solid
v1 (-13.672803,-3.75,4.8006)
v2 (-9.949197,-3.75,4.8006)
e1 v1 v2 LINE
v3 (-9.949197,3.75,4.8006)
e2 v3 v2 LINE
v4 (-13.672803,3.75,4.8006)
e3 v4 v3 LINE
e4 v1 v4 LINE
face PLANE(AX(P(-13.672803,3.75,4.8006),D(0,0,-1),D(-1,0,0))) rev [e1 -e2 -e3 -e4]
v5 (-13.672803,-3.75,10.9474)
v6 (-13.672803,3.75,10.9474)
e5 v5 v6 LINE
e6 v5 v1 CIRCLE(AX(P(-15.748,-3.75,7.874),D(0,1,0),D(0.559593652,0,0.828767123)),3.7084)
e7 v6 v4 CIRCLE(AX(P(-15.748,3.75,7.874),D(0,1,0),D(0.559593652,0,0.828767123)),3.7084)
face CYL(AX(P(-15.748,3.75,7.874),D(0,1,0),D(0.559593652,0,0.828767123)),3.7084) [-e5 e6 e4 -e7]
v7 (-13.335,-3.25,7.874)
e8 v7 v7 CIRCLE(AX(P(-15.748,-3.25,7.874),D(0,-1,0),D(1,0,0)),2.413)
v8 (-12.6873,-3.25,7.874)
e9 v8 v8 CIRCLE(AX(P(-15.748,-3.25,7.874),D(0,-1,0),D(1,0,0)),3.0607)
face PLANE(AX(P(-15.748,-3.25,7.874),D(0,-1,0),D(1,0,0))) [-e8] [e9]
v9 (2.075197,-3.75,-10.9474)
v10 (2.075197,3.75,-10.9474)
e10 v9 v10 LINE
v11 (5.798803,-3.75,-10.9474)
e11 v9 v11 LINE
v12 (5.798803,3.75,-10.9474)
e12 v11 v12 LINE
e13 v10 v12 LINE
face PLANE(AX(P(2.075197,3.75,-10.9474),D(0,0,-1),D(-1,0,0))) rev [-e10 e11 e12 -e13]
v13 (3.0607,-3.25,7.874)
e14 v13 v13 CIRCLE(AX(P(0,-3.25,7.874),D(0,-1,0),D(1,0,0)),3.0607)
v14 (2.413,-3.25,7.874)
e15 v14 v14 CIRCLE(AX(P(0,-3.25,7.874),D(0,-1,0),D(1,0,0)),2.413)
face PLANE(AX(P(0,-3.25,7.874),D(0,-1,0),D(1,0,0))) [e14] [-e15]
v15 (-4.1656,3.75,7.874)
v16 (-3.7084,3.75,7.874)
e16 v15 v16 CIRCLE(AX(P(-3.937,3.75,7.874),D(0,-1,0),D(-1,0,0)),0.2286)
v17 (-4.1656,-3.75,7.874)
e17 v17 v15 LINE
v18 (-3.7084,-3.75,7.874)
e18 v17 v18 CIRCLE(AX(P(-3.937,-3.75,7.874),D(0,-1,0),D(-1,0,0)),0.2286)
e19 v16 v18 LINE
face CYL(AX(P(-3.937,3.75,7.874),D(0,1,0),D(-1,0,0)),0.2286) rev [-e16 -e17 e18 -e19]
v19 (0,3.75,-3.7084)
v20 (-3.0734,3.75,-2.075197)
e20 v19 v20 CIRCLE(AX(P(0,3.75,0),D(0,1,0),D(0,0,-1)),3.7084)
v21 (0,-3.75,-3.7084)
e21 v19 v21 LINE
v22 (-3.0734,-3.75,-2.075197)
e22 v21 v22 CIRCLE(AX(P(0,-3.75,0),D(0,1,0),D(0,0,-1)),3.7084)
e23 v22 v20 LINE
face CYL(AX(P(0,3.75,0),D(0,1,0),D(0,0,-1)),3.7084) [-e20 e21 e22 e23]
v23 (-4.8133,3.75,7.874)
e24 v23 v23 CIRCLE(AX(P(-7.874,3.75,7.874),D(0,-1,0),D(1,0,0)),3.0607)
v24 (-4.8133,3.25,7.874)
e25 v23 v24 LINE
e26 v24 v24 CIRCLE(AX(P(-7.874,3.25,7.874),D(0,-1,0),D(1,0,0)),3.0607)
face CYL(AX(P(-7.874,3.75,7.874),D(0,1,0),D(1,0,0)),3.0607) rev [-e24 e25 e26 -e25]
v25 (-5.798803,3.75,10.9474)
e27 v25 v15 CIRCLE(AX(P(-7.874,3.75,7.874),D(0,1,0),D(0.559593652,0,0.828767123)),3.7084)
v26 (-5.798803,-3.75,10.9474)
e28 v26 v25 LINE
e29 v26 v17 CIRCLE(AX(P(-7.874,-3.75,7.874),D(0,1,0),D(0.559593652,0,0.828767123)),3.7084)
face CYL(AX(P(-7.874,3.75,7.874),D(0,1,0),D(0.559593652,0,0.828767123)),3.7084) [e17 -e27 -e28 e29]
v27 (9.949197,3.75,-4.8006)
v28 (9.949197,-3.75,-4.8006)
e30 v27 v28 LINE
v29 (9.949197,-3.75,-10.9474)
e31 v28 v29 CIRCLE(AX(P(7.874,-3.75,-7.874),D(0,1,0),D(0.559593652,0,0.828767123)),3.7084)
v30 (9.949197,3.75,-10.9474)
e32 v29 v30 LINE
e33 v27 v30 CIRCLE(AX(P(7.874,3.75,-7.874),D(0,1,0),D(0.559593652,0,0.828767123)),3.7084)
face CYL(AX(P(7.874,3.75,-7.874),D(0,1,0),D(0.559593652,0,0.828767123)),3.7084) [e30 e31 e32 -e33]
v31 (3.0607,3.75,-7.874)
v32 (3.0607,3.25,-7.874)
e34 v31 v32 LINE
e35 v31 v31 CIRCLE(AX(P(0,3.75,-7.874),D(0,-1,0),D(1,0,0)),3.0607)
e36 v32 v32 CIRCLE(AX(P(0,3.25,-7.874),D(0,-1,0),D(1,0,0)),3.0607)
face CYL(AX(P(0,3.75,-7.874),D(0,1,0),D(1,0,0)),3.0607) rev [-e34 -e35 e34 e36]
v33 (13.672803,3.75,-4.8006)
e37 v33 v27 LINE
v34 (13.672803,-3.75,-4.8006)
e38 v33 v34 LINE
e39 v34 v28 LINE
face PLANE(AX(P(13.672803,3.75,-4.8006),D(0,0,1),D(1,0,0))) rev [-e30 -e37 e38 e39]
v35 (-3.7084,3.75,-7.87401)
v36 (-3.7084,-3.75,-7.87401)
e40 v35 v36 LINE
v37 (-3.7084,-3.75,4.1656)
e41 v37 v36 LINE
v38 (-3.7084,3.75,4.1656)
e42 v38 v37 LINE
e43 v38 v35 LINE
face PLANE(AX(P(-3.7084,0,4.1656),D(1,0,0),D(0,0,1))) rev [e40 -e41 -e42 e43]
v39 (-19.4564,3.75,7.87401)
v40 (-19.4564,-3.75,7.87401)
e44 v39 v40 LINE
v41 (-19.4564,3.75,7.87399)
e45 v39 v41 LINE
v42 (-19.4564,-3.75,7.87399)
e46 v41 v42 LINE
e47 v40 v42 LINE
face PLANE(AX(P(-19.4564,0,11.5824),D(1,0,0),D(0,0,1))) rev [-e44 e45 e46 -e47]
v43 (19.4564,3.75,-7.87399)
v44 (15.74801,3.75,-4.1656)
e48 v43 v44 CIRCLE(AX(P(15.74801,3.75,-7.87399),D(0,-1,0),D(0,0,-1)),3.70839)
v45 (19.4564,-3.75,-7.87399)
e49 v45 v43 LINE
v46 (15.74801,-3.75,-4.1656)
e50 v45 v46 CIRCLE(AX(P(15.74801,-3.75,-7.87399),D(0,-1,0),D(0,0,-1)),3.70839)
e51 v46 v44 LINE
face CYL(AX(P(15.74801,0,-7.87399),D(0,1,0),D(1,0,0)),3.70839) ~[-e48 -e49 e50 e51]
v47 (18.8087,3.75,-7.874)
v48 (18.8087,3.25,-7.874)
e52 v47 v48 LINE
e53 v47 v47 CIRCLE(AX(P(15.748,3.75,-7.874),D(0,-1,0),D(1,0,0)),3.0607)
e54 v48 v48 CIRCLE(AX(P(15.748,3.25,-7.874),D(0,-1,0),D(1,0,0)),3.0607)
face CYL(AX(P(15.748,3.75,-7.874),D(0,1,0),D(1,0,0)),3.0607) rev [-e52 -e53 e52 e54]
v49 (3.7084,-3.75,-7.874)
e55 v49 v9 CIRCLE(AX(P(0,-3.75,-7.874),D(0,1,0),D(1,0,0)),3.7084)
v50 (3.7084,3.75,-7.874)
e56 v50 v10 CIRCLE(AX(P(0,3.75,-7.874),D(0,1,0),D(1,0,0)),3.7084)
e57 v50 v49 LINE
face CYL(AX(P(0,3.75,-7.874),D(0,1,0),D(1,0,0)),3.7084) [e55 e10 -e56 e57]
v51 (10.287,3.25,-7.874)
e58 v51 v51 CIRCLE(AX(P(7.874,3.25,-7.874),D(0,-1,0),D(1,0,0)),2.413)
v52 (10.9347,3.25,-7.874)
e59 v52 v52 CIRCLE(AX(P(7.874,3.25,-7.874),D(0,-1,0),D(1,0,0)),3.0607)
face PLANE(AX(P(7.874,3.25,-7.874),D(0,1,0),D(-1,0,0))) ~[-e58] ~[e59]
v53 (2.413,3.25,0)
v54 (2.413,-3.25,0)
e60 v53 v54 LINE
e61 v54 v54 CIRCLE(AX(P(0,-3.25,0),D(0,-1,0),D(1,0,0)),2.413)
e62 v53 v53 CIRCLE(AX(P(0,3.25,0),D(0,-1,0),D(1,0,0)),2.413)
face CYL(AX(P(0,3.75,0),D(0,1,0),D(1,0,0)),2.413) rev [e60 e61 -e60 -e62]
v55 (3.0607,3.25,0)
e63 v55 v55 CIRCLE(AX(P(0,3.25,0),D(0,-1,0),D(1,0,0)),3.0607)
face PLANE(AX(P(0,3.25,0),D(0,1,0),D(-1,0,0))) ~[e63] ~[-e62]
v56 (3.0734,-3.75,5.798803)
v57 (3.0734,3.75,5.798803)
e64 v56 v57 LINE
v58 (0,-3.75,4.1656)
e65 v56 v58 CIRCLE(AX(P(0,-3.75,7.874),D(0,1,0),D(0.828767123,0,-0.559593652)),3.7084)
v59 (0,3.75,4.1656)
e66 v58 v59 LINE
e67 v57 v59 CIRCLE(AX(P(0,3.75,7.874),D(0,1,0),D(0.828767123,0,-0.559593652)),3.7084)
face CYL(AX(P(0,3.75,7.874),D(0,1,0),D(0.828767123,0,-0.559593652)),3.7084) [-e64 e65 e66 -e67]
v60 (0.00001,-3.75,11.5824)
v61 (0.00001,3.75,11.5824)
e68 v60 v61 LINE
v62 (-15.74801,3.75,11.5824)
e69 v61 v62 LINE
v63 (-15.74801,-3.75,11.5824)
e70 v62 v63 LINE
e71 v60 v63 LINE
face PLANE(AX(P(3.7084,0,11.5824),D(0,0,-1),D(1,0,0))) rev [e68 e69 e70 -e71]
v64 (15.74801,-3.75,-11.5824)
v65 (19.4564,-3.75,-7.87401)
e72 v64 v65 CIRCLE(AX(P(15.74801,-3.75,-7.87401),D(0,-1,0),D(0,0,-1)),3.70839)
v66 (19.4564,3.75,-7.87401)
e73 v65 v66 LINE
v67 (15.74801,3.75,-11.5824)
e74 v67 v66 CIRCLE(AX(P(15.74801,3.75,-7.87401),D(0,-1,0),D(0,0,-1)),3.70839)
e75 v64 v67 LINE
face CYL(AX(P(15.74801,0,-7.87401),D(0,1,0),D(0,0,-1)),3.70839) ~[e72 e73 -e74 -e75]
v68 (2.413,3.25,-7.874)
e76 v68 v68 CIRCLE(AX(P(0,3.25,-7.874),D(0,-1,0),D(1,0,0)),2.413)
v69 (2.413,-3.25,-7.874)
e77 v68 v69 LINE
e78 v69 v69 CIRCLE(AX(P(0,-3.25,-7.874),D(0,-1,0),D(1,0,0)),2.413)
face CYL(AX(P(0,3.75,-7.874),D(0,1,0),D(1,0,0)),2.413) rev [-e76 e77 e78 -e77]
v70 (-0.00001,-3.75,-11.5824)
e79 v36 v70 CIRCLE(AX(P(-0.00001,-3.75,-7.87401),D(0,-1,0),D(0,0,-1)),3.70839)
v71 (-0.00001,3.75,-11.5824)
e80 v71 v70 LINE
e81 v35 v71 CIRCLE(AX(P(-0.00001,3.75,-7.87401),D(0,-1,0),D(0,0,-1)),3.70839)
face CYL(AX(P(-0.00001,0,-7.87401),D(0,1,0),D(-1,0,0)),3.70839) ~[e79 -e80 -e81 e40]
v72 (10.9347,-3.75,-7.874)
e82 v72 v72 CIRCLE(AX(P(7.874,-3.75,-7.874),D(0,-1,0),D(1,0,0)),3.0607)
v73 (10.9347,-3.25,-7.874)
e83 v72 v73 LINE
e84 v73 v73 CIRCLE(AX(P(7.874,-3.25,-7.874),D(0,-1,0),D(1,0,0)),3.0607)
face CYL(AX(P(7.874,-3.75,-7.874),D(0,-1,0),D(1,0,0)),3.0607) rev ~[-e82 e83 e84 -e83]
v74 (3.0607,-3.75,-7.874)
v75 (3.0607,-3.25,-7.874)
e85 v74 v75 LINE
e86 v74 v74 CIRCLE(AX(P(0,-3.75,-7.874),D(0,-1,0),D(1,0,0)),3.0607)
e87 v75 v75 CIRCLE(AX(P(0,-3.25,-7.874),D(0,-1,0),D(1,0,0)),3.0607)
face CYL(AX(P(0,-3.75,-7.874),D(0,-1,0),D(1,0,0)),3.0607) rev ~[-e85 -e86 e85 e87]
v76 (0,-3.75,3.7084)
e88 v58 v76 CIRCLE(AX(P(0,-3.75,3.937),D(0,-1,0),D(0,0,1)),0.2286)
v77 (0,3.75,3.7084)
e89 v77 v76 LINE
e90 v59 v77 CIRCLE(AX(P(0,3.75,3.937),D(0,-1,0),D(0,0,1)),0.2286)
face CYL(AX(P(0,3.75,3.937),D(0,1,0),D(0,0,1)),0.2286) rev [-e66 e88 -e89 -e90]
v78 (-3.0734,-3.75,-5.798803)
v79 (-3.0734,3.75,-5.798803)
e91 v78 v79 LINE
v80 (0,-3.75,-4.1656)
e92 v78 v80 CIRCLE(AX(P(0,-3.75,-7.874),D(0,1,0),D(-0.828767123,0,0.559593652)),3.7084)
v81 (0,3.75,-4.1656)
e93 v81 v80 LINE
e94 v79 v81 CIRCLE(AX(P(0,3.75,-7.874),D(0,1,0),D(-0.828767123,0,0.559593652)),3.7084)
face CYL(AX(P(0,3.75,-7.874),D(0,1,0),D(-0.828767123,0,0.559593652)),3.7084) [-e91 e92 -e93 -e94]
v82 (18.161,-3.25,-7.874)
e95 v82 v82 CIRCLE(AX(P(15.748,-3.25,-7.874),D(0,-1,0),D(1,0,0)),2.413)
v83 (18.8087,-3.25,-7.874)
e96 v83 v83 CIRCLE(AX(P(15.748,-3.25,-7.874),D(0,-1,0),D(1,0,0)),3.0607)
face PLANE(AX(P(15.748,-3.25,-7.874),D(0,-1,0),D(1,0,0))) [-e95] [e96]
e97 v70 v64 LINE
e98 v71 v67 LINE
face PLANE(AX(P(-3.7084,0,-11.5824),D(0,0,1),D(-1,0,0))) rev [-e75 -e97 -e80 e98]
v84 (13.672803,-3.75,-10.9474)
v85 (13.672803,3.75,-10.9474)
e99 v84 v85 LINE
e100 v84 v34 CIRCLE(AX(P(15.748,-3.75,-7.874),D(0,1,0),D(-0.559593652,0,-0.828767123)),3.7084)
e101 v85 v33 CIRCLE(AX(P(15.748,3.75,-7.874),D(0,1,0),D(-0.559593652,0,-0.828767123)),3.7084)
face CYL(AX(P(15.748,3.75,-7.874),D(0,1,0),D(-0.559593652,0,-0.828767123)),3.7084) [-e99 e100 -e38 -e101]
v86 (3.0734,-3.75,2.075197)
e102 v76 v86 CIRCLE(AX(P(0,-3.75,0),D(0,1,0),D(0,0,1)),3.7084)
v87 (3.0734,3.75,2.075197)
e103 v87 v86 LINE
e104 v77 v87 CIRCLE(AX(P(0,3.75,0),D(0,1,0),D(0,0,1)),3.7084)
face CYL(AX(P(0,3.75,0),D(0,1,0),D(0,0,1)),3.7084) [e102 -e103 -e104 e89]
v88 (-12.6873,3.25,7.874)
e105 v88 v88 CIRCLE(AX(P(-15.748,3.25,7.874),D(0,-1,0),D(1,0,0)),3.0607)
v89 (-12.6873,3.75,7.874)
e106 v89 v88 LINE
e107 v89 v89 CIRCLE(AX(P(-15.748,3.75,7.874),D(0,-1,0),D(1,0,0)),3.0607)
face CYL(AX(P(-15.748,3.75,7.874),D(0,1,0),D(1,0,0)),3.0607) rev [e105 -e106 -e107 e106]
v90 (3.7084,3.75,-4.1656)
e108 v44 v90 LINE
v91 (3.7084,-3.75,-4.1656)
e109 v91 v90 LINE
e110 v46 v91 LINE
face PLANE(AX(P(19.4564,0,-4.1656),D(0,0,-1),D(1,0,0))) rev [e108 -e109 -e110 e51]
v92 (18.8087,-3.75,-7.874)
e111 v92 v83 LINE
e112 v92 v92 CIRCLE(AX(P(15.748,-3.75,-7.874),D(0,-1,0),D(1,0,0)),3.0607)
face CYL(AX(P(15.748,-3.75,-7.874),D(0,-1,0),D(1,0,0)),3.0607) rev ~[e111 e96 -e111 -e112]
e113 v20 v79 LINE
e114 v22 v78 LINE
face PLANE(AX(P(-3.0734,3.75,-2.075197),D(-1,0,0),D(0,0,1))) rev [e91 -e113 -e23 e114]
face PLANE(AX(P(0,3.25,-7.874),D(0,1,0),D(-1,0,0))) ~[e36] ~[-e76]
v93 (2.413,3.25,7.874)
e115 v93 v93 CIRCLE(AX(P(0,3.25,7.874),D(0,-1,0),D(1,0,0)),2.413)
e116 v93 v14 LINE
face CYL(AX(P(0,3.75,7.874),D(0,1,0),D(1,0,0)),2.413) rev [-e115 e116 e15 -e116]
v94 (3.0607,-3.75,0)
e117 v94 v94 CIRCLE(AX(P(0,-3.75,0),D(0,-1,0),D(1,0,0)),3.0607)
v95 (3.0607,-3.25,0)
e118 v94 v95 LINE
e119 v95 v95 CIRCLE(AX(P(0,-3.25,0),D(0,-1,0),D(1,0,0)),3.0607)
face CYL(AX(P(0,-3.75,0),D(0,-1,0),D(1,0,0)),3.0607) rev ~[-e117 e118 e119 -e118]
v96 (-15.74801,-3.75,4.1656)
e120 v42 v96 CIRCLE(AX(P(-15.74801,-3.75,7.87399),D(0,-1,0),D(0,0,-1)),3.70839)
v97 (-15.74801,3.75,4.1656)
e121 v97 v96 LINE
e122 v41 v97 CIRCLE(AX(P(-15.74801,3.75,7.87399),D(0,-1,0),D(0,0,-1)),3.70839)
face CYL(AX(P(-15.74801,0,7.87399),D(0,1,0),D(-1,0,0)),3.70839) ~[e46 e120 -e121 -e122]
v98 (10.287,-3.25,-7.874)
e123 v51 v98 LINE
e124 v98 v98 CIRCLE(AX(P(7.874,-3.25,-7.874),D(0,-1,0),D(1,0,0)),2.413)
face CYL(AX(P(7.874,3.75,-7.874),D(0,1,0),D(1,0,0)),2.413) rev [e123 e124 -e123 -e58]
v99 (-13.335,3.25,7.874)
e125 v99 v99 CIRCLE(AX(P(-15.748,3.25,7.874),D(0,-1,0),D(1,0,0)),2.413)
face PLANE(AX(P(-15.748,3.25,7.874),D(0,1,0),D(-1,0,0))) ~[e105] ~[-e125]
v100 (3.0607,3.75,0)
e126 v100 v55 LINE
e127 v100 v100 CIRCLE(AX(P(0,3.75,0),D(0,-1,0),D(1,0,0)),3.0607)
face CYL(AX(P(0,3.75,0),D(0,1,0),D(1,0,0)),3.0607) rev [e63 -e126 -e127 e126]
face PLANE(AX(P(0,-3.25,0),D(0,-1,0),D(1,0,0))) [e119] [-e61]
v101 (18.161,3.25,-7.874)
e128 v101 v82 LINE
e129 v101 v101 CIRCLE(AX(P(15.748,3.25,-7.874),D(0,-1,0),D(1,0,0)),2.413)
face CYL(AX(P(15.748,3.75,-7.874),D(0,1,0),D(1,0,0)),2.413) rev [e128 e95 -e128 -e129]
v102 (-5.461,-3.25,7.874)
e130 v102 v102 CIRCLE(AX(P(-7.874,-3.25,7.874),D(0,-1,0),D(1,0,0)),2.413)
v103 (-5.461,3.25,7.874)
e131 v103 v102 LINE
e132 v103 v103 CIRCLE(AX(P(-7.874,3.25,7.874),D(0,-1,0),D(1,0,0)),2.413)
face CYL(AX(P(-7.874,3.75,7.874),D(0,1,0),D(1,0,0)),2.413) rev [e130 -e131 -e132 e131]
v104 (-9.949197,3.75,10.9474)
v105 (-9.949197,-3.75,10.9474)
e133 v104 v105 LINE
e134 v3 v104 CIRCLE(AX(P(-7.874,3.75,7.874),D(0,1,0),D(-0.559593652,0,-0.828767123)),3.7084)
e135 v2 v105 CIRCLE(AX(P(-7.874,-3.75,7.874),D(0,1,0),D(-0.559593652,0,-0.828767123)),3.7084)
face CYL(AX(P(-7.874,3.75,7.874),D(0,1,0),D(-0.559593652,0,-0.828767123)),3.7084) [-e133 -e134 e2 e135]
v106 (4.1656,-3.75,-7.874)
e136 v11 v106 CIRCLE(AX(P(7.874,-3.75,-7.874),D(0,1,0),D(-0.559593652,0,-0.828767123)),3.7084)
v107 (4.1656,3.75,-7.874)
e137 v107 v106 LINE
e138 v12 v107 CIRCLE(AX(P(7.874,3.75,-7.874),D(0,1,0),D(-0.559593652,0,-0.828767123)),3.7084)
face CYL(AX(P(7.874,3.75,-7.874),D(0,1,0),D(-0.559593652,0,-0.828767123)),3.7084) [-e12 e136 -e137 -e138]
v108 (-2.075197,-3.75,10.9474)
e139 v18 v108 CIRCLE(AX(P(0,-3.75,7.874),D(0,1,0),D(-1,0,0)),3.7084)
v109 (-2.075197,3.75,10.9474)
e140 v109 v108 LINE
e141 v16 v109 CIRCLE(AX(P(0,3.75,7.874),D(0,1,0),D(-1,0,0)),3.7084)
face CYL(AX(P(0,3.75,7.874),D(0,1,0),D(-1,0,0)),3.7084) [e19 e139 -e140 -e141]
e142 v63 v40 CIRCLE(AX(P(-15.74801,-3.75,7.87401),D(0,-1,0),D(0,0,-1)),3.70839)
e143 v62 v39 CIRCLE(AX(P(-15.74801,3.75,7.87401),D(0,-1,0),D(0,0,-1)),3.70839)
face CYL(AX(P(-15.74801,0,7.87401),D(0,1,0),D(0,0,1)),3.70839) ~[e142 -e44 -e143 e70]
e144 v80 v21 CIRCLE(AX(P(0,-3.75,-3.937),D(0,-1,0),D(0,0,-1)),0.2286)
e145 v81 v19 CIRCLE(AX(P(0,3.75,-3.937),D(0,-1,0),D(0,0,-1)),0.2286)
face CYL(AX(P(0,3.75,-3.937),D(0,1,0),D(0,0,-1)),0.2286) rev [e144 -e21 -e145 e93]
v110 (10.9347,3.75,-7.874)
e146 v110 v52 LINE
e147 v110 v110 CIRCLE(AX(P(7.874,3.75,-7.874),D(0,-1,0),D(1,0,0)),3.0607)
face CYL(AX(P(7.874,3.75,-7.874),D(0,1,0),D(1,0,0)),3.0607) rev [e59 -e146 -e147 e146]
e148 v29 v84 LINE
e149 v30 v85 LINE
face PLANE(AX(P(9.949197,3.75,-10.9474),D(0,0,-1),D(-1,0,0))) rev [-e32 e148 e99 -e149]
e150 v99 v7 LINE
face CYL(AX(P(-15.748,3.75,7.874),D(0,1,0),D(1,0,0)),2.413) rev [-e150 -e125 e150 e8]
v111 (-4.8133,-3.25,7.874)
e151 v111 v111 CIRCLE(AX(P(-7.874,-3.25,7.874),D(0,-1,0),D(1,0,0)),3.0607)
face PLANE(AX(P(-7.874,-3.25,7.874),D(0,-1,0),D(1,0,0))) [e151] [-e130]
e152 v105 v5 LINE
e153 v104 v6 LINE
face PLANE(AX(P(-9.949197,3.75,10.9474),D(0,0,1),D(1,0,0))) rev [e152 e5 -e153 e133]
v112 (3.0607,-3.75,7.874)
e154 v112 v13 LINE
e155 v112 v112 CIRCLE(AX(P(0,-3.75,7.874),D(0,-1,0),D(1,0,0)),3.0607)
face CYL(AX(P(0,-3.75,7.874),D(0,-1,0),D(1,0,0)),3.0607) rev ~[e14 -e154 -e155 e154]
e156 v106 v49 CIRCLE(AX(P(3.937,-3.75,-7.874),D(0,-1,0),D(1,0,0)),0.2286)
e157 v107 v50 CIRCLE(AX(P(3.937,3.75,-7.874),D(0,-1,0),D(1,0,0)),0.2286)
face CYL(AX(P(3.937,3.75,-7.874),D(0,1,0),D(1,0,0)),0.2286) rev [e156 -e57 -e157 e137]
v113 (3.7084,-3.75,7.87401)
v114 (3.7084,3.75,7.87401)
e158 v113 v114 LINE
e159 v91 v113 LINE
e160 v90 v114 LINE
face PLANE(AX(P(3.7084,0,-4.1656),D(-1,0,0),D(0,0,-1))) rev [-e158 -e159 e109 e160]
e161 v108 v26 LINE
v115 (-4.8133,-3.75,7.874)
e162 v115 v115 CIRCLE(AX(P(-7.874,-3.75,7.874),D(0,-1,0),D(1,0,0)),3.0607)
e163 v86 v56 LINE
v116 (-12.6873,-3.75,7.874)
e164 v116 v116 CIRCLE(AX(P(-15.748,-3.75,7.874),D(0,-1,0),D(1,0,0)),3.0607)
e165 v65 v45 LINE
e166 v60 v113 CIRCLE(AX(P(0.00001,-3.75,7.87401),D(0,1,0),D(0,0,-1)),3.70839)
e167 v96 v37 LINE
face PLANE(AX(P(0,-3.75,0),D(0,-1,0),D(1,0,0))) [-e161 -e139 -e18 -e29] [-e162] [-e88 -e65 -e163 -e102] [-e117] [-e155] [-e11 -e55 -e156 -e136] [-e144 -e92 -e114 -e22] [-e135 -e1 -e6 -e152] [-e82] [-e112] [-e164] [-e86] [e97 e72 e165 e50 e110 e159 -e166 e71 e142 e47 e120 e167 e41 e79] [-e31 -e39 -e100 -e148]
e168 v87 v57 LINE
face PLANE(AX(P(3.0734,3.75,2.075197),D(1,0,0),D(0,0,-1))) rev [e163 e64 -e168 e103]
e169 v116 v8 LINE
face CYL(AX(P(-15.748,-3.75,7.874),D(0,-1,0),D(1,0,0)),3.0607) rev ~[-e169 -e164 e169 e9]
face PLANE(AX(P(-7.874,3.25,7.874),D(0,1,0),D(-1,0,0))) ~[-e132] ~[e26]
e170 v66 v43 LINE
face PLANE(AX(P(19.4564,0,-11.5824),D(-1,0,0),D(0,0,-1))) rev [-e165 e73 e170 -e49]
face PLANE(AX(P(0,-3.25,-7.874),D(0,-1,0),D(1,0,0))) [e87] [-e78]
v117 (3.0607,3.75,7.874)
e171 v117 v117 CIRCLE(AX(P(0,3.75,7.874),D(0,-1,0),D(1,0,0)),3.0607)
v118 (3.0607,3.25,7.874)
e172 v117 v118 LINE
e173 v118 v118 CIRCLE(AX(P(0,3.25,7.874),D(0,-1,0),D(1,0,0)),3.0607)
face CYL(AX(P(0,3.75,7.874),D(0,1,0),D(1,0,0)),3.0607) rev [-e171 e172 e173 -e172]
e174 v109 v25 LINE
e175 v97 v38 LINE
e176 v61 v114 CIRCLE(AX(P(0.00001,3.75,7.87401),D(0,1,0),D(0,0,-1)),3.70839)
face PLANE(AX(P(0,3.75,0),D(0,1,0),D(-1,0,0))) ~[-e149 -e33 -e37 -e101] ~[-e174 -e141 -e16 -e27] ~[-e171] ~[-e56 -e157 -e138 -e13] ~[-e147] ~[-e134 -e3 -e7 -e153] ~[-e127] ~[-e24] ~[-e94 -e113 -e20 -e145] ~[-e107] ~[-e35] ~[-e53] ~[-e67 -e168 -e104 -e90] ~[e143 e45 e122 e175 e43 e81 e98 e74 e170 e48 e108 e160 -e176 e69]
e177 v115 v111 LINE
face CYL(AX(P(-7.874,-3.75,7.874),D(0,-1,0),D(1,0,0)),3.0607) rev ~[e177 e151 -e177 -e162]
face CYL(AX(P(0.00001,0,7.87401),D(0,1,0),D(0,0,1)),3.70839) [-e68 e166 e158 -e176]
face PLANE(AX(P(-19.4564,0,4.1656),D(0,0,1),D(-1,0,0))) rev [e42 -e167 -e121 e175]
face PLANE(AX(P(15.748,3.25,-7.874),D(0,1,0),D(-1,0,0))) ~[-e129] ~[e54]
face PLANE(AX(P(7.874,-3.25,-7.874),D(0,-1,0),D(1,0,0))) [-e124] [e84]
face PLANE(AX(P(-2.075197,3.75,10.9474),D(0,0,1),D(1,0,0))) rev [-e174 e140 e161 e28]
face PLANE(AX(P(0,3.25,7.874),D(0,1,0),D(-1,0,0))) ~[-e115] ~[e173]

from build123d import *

# Parameters (mm, degrees)
F1_DEPTH = 3.75
F2_R     = 3.70839
F4_DEPTH = 3.9243
F5_R     = 2.413
F6_DEPTH = 3.75
F7_R     = 3.0607
F8_DEPTH = 0.5


# Not quite as in the source:
# - a fillet or chamfer is up to 0.001 mm smaller than in the source, because OpenCascade refuses the exact size
# - a length typed as a fraction of an inch, garbled in the dataset ("3 / 203.2 mm" for 3/8 in), is restored


with BuildPart() as f1:
    # F0 (on Front) → F1 (new body)
    with BuildSketch(Plane.XZ):
        Polygon((3.7084, 11.5824), (-19.4564, 11.5824), (-19.4564, 4.1656), (-3.7084, 4.1656), (-3.7084, -11.5824), (19.4564, -11.5824), (19.4564, -4.1656), (3.7084, -4.1656), align=None)
    extrude(amount=F1_DEPTH)

    # F2 (radius 3.7084 in the source; OpenCascade refuses exactly that, so slightly less here)
    f2_edges = [f1.edges().sort_by_distance(p)[0] for p in [
        (-19.4564, -1.875, 11.5824),
        (3.7084, -1.875, 11.5824),
        (19.4564, -1.875, -4.1656),
        (19.4564, -1.875, -11.5824),
        (-3.7084, -1.875, -11.5824),
        (-19.4564, -1.875, 4.1656),
    ]]
    fillet(f2_edges, radius=F2_R)

    # F3 (on face) → F4 (cut)
    with BuildSketch(Plane.XZ.offset(3.75)):
        with BuildLine():
            Line((-9.9491970991, 10.9474), (-13.6728029009, 10.9474))
            ThreePointArc((-13.6728029009, 10.9474), (-12.0396, 7.874), (-13.6728029009, 4.8006))
            Line((-13.6728029009, 4.8006), (-9.9491970991, 4.8006))
            ThreePointArc((-9.9491970991, 4.8006), (-11.5824, 7.874), (-9.9491970991, 10.9474))
        make_face()
        with BuildLine():
            Line((-2.0751970991, 10.9474), (-5.7988029009, 10.9474))
            ThreePointArc((-5.7988029009, 10.9474), (-4.5992563854, 9.6141967759), (-4.1656, 7.874))
            ThreePointArc((-4.1656, 7.874), (-3.937, 7.6454), (-3.7084, 7.874))
            ThreePointArc((-3.7084, 7.874), (-3.2747436146, 9.6141967759), (-2.0751970991, 10.9474))
        make_face()
        with BuildLine():
            Line((3.0734, 2.0751970991), (3.0734, 5.7988029009))
            ThreePointArc((3.0734, 5.7988029009), (1.7401967759, 4.5992563854), (0, 4.1656))
            ThreePointArc((0, 4.1656), (-0.2286, 3.937), (0, 3.7084))
            ThreePointArc((0, 3.7084), (1.7401967759, 3.2747436146), (3.0734, 2.0751970991))
        make_face()
        with BuildLine():
            ThreePointArc((0, -3.7084), (-1.7401967759, -3.2747436146), (-3.0734, -2.0751970991))
            Line((-3.0734, -2.0751970991), (-3.0734, -5.7988029009))
            ThreePointArc((-3.0734, -5.7988029009), (-1.7401967759, -4.5992563854), (0, -4.1656))
            ThreePointArc((0, -4.1656), (0.2286, -3.937), (0, -3.7084))
        make_face()
        with BuildLine():
            ThreePointArc((3.7084, -7.874), (3.2747436146, -9.6141967759), (2.0751970991, -10.9474))
            Line((2.0751970991, -10.9474), (5.7988029009, -10.9474))
            ThreePointArc((5.7988029009, -10.9474), (4.5992563854, -9.6141967759), (4.1656, -7.874))
            ThreePointArc((4.1656, -7.874), (3.937, -7.6454), (3.7084, -7.874))
        make_face()
        with BuildLine():
            ThreePointArc((9.9491970991, -4.8006), (11.5824, -7.874), (9.9491970991, -10.9474))
            Line((9.9491970991, -10.9474), (13.6728029009, -10.9474))
            ThreePointArc((13.6728029009, -10.9474), (12.0396, -7.874), (13.6728029009, -4.8006))
            Line((13.6728029009, -4.8006), (9.9491970991, -4.8006))
        make_face()
    extrude(amount=-F4_DEPTH, mode=Mode.SUBTRACT)

    # F5 (on face) → F6 (cut, through all)
    with BuildSketch(Plane.XZ.offset(3.75)):
        with Locations((-15.748, 7.874)):
            Circle(F5_R)
        with Locations((0, 7.874)):
            Circle(F5_R)
        with Locations((0, -7.874)):
            Circle(F5_R)
        with Locations((15.748, -7.874)):
            Circle(F5_R)
        with Locations((-7.874, 7.874)):
            Circle(F5_R)
        Circle(F5_R)
        with Locations((7.874, -7.874)):
            Circle(F5_R)
    extrude(amount=-F6_DEPTH, mode=Mode.SUBTRACT)

    # F7 (on face) → F8 (cut)
    with BuildSketch(Plane.XZ.offset(3.75)):
        with Locations((-15.748, 7.874)):
            Circle(F7_R)
        with Locations((-7.874, 7.874)):
            Circle(F7_R)
        with Locations((0, 7.874)):
            Circle(F7_R)
        Circle(F7_R)
        with Locations((0, -7.874)):
            Circle(F7_R)
        with Locations((7.874, -7.874)):
            Circle(F7_R)
        with Locations((15.748, -7.874)):
            Circle(F7_R)
    extrude(amount=-F8_DEPTH, mode=Mode.SUBTRACT)

    # F9: F1 across plane


with BuildPart() as f1_1:
    add(f1.part)
    add(f1.part.mirror(Plane.XZ))


solid = f1_1.part
